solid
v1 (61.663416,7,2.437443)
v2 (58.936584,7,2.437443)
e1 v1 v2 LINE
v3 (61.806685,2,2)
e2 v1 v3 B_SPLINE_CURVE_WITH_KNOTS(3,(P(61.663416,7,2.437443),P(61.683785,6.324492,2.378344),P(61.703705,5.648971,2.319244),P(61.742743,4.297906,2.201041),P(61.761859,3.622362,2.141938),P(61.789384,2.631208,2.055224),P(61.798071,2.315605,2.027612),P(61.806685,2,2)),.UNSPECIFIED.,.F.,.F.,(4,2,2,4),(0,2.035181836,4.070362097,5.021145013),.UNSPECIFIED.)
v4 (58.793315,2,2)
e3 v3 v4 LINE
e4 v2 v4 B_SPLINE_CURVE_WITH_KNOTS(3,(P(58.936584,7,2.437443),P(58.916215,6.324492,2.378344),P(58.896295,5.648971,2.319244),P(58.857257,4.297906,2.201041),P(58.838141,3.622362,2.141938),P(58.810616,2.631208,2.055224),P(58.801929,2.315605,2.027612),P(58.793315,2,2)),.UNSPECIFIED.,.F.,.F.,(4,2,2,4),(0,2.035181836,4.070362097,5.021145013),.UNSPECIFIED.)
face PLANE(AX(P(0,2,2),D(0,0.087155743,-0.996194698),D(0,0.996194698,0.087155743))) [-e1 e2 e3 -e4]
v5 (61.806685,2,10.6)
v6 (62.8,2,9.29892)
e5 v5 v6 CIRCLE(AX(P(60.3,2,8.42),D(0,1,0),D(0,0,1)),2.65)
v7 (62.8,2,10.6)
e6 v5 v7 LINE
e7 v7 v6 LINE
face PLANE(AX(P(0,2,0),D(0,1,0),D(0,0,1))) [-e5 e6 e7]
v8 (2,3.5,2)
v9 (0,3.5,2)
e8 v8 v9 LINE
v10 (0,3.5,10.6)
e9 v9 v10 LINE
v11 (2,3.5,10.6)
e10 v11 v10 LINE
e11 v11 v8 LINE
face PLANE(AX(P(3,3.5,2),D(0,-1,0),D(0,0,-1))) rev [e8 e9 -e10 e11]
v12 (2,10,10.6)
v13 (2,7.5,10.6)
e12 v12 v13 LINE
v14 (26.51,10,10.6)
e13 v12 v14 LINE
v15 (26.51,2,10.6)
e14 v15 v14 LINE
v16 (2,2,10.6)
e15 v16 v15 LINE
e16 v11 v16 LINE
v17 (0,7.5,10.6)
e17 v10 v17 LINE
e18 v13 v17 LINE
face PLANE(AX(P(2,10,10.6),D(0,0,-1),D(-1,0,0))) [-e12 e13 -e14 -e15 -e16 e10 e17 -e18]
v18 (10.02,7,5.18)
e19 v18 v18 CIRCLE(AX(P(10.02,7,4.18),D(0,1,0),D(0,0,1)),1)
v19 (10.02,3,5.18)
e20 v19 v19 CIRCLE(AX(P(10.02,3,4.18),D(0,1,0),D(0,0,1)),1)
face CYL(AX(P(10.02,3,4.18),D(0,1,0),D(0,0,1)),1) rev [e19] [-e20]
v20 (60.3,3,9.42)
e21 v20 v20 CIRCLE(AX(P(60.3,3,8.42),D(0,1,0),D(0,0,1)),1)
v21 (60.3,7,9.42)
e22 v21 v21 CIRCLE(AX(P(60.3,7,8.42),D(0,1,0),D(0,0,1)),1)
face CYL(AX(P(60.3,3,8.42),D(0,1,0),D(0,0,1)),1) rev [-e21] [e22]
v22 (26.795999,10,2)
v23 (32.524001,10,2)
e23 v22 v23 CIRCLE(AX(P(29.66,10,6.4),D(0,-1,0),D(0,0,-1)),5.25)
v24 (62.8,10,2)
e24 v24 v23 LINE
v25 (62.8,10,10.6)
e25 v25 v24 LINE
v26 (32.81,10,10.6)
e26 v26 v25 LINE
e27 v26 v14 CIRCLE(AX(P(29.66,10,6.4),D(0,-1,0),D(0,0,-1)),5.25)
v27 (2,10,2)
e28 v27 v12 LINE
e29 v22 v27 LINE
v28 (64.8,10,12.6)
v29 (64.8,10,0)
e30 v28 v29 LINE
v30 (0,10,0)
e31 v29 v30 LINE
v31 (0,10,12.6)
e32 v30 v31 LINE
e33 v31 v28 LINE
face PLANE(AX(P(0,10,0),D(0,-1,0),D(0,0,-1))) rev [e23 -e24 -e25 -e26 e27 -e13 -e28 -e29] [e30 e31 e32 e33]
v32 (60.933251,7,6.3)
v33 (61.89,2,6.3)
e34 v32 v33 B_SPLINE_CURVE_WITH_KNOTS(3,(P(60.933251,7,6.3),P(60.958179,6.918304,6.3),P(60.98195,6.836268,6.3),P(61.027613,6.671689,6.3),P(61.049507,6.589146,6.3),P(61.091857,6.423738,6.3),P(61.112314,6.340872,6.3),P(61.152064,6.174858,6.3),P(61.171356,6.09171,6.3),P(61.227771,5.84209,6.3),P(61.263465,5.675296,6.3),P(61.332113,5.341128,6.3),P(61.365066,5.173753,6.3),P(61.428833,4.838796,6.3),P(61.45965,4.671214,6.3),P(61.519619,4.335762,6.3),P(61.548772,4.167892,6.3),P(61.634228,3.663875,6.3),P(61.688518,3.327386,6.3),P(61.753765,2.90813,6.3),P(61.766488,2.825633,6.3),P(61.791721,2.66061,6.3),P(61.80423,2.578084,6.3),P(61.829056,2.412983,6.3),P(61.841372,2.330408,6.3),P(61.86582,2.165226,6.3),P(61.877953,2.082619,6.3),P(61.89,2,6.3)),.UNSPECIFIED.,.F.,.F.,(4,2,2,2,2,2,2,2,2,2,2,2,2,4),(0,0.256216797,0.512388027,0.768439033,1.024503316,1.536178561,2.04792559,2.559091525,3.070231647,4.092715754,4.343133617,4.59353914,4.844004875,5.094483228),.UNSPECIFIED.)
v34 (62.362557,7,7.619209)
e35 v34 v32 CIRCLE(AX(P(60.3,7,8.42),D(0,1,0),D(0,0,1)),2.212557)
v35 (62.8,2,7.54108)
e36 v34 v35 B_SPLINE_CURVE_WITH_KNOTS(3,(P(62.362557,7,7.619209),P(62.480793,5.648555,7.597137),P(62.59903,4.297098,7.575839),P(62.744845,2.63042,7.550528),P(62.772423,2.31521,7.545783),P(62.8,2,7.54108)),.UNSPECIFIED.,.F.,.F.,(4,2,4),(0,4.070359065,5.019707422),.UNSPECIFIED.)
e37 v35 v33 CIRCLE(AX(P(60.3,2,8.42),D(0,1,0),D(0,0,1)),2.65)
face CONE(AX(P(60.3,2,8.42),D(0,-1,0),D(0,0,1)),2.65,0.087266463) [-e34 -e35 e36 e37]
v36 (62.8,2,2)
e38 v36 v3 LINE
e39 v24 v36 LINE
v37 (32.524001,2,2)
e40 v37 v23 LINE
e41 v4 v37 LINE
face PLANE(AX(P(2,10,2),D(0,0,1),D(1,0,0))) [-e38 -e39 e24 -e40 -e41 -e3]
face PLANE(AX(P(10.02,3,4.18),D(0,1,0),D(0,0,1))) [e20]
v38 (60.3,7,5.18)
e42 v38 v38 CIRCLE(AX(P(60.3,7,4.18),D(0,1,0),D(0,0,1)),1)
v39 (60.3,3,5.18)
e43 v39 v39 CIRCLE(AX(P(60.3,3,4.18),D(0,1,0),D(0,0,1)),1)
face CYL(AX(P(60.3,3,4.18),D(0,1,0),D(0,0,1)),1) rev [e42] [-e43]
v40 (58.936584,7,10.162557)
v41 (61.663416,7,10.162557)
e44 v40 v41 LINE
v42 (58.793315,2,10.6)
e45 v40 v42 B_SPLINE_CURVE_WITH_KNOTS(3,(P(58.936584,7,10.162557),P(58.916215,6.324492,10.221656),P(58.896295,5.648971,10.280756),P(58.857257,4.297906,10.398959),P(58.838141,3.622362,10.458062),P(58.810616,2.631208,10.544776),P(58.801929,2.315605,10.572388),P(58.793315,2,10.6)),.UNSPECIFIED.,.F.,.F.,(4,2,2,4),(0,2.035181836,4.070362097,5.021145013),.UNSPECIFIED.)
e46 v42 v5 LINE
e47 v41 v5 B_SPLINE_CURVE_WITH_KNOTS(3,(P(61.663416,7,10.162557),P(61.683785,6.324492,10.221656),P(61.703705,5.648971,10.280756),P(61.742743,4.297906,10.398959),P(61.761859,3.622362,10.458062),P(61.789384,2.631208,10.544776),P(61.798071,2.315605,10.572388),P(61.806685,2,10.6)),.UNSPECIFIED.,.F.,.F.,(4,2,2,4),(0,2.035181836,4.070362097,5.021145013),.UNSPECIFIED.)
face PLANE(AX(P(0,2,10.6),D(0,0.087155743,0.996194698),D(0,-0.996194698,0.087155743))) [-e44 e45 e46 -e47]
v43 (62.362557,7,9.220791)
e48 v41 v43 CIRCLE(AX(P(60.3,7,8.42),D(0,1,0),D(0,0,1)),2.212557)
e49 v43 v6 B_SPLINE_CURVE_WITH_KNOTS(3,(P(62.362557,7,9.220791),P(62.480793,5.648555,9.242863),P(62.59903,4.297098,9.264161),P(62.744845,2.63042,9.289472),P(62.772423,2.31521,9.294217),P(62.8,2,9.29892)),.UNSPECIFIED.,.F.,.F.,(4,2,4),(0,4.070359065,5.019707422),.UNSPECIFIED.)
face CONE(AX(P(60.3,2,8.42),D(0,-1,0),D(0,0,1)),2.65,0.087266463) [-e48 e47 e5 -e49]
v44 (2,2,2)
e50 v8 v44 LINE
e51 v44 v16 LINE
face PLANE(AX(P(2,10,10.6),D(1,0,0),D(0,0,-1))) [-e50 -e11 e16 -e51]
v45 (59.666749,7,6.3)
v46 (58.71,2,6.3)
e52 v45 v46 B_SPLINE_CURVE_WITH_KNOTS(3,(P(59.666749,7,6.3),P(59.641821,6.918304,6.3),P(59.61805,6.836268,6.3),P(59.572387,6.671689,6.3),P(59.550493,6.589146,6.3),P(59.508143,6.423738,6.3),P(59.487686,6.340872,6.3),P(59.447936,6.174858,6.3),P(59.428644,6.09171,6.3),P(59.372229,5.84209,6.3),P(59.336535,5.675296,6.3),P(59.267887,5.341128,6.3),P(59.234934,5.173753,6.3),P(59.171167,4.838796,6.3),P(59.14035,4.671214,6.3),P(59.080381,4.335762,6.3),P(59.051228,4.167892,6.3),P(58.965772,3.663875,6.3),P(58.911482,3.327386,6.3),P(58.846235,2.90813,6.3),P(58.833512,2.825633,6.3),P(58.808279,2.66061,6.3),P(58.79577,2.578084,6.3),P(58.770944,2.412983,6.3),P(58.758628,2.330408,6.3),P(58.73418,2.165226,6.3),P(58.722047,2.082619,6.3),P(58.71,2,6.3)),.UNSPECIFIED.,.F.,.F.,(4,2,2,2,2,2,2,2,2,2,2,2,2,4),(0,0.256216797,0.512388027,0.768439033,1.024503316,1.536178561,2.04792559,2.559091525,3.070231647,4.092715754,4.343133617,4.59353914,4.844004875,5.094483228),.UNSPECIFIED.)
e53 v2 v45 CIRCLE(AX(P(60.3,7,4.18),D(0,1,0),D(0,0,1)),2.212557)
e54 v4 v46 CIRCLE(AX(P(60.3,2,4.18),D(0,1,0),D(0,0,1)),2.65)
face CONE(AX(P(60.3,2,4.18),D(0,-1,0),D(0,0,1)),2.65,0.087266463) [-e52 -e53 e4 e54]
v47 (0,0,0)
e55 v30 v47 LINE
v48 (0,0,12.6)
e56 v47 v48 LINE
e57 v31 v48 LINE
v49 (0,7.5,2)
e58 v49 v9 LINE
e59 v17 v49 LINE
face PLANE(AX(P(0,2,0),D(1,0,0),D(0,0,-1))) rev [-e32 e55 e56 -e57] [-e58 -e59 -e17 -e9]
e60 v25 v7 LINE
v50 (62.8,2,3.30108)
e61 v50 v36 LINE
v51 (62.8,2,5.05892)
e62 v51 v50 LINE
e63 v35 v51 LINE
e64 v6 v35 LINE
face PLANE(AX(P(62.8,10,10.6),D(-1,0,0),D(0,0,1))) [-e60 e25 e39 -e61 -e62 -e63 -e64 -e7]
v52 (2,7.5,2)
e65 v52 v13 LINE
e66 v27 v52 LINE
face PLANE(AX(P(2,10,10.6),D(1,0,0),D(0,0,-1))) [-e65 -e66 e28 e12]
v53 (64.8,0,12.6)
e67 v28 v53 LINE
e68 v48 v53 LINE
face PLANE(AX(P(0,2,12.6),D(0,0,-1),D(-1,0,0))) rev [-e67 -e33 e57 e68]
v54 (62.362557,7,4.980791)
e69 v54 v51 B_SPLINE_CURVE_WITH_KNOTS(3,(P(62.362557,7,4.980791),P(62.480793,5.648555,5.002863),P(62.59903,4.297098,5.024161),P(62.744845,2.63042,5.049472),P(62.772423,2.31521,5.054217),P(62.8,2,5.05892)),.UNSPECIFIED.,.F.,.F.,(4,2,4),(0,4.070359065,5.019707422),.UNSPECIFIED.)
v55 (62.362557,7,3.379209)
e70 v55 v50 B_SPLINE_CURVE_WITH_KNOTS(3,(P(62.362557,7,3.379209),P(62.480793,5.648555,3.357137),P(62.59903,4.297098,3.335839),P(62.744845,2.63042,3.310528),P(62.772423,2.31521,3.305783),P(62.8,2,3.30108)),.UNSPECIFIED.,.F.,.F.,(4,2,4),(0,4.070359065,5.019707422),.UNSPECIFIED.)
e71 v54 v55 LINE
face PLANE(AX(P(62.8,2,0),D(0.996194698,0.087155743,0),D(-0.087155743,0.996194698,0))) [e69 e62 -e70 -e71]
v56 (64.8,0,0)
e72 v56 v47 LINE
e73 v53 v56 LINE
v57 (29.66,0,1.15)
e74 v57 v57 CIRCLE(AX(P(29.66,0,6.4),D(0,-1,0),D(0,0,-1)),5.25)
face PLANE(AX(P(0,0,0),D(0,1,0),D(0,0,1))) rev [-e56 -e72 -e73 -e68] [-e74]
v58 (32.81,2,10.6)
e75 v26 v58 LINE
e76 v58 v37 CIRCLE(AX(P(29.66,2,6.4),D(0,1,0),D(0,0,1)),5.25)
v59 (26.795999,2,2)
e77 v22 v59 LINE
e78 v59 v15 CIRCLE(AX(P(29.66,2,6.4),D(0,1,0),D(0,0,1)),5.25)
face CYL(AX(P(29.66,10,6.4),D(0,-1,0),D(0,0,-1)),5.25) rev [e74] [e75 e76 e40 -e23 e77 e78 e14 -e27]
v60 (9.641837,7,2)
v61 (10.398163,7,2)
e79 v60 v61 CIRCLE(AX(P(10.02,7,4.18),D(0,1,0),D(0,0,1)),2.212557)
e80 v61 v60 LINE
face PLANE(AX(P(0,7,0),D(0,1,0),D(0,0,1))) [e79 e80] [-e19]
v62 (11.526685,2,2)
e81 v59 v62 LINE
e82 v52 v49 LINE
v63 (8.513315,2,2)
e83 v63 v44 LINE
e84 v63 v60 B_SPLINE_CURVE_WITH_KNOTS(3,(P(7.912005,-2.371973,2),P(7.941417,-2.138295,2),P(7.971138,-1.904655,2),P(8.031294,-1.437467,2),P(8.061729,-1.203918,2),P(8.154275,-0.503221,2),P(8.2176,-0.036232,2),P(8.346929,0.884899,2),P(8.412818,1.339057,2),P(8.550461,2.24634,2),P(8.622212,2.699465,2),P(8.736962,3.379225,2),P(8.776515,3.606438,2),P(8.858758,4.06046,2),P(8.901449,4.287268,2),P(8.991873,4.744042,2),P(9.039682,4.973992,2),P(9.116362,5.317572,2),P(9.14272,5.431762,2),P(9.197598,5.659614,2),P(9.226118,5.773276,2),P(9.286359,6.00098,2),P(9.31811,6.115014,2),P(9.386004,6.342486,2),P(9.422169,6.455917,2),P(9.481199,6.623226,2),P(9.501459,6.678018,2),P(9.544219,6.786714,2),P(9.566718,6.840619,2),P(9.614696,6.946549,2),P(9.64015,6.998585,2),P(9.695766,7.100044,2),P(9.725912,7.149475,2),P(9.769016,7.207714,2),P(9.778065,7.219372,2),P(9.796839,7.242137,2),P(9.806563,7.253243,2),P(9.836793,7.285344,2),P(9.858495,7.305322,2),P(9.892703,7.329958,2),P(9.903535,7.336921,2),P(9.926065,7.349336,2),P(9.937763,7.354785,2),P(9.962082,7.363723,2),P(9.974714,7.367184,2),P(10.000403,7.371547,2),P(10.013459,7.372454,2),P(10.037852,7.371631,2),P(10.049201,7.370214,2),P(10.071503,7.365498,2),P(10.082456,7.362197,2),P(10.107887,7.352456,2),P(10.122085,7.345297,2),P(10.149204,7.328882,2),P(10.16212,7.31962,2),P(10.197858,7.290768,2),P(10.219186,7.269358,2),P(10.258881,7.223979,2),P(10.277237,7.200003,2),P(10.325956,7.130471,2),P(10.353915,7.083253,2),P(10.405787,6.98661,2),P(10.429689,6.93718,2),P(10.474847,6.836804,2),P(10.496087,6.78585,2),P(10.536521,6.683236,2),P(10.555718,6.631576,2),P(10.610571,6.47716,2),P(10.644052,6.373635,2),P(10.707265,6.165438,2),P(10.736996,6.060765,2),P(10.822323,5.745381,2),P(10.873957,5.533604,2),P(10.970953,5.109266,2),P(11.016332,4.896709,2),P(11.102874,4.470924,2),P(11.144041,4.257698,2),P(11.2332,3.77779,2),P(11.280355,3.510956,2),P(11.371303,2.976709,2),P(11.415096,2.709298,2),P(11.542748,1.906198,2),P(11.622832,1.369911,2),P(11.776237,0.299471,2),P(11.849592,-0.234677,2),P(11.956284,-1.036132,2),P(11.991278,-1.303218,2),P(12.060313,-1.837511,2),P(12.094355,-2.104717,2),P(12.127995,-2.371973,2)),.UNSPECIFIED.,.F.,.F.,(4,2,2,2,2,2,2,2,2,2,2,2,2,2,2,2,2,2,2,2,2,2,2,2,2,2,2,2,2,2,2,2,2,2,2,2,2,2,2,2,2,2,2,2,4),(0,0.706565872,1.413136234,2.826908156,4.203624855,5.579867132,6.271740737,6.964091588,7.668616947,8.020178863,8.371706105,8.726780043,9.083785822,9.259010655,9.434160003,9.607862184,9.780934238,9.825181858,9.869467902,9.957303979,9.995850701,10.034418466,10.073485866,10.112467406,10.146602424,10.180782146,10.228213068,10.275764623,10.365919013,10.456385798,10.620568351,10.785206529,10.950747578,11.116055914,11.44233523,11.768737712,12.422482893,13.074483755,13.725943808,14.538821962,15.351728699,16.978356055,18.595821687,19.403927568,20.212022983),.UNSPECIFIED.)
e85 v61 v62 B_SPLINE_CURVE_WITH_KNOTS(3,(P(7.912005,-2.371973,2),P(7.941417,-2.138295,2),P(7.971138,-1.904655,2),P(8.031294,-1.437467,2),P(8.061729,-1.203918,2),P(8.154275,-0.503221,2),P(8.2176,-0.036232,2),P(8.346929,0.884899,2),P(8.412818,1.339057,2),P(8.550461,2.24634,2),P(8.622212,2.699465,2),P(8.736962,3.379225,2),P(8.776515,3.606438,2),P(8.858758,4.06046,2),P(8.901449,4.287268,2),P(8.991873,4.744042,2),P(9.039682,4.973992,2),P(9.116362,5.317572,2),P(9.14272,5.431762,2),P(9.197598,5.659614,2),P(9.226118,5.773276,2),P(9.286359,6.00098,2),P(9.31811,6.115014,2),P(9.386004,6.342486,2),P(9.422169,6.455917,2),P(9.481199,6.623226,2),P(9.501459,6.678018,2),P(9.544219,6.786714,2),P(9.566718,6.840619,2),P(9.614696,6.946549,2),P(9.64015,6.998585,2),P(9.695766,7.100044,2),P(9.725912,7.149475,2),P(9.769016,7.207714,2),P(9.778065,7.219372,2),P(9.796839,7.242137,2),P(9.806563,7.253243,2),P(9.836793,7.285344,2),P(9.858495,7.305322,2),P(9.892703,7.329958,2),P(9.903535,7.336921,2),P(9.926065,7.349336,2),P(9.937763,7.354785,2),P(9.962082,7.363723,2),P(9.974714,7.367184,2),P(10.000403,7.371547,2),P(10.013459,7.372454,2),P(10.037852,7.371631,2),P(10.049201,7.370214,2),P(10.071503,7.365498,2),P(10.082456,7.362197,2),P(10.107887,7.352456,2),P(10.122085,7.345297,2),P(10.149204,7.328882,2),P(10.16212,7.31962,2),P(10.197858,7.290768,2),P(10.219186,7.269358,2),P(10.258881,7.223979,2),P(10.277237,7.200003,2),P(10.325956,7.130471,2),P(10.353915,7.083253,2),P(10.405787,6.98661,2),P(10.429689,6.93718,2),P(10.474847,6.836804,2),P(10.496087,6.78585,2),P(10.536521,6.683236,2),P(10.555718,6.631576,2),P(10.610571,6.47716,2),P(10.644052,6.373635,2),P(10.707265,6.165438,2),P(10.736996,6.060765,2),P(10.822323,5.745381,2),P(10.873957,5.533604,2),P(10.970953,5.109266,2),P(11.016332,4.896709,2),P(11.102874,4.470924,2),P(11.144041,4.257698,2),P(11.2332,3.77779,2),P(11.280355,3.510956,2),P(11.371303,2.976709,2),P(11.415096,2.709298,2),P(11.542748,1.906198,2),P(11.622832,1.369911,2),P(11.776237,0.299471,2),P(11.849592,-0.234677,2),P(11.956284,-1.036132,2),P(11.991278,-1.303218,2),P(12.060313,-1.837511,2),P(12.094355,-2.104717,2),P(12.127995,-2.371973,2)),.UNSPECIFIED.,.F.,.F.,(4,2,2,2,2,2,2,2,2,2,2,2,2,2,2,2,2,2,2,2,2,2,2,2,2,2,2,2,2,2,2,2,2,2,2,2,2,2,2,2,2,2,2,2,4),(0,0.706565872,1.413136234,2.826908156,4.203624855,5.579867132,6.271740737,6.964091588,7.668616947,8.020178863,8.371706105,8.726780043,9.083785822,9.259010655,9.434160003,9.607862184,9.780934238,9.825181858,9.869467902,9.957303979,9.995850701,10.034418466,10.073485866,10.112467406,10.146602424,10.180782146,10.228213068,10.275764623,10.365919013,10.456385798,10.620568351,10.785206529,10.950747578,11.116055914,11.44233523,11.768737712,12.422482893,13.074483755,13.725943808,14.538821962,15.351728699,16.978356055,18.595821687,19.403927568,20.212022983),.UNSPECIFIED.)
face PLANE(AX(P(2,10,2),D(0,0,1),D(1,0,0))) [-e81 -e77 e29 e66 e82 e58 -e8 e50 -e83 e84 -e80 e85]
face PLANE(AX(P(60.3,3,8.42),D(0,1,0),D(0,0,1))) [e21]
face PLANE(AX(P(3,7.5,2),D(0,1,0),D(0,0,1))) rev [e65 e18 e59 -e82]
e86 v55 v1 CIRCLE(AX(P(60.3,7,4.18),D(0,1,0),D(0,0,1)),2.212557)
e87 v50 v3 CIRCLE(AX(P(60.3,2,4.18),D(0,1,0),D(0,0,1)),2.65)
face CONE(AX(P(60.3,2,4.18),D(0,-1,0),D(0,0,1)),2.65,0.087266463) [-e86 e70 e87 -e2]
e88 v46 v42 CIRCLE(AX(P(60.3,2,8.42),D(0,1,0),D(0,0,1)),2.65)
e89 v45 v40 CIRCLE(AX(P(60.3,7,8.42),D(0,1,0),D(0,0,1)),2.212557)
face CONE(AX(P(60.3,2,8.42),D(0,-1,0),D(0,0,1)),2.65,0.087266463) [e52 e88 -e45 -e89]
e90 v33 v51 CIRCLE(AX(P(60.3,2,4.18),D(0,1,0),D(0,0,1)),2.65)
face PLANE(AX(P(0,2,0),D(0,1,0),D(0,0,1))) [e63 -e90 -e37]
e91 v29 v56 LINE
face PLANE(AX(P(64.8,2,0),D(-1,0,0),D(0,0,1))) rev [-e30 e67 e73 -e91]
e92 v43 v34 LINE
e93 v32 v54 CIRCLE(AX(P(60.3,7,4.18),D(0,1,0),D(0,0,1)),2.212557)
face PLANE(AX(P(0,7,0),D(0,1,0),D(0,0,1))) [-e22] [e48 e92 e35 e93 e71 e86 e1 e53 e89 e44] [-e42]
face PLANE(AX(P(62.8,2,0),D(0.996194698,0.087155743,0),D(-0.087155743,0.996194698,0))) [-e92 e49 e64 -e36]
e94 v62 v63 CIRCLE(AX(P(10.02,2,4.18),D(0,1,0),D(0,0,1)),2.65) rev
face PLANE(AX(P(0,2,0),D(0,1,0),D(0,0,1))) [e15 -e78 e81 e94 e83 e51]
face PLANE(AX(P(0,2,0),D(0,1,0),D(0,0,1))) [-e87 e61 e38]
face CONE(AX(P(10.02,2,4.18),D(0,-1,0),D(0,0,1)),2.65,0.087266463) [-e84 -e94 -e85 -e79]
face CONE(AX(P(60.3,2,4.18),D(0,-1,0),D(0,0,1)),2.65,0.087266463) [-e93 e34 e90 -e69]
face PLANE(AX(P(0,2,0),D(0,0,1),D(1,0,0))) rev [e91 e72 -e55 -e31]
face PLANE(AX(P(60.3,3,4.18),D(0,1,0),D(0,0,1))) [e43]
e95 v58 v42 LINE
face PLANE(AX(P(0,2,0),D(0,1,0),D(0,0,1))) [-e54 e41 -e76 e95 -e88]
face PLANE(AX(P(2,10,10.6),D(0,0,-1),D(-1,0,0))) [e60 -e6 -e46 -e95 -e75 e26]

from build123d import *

# Parameters (mm, degrees)
SKETCH1_W                     = 64.8
SKETCH1_H                     = 12.6
BOSS_EXTRUDE1_DEPTH           = 2
SKETCH2_W                     = 64.8
SKETCH2_H                     = 12.6
SKETCH2_W_2                   = 60.8
SKETCH2_H_2                   = 8.6
BOSS_EXTRUDE2_DEPTH           = 8
SKETCH3_R                     = 5.25
CUT_EXTRUDE1_DEPTH            = 67.766758196
BOSS_EXTRUDE3_DEPTH           = 5
BOSS_EXTRUDE3_DRAFT           = 5
SKETCH4_R                     = 2.65
BOSS_EXTRUDE3_PROFILE_2_DEPTH = 5
BOSS_EXTRUDE3_PROFILE_2_DRAFT = 5
SKETCH5_R                     = 1
CUT_EXTRUDE2_DEPTH            = 4
SKETCH6_W                     = 8.6
SKETCH6_H                     = 4
CUT_EXTRUDE3_DEPTH            = 3


with BuildPart() as part:
    # Sketch1 → Boss-Extrude1 (new body)
    with BuildSketch(Plane(origin=(0, 0, 0), x_dir=(1, 0, 0), z_dir=(0, 1, 0))):
        with Locations((32.4, -6.3)):
            Rectangle(SKETCH1_W, SKETCH1_H)
    extrude(amount=BOSS_EXTRUDE1_DEPTH)

    # Sketch2 → Boss-Extrude2 (add)
    with BuildSketch(Plane(origin=(0, 2, 0), x_dir=(1, 0, 0), z_dir=(0, 1, 0))):
        with Locations((32.4, -6.3)):
            Rectangle(SKETCH2_W, SKETCH2_H)
        with Locations((32.4, -6.3)):
            Rectangle(SKETCH2_W_2, SKETCH2_H_2, mode=Mode.SUBTRACT)
    extrude(amount=BOSS_EXTRUDE2_DEPTH)

    # Sketch3 → Cut-Extrude1 (cut, through all)
    with BuildSketch(Plane(origin=(0, 0, 0), x_dir=(-1, 0, 0), z_dir=(0, -1, 0))):
        with Locations((-29.66, -6.4)):
            Circle(SKETCH3_R)
    extrude(amount=-CUT_EXTRUDE1_DEPTH, mode=Mode.SUBTRACT)


with BuildPart() as boss_extrude3_tool:
    # Sketch4 → Boss-Extrude3 (with draft: the straight prism first)
    with BuildSketch(Plane(origin=(0, 2, 0), x_dir=(1, 0, 0), z_dir=(0, 1, 0))):
        with BuildLine():
            Line((62.8, -5.058919792), (62.8, -3.301080208))
            ThreePointArc((62.8, -3.301080208), (62.406319968, -2.571921583), (61.806685103, -2))
            Line((61.806685103, -2), (58.793314897, -2))
            ThreePointArc((58.793314897, -2), (57.650497281, -4.128664408), (58.71, -6.3))
            ThreePointArc((58.71, -6.3), (57.650497281, -8.471335592), (58.793314897, -10.6))
            Line((58.793314897, -10.6), (61.806685103, -10.6))
            ThreePointArc((61.806685103, -10.6), (62.406319968, -10.028078417), (62.8, -9.298919792))
            Line((62.8, -9.298919792), (62.8, -7.541080208))
            ThreePointArc((62.8, -7.541080208), (62.437076279, -6.85302681), (61.89, -6.3))
            ThreePointArc((61.89, -6.3), (62.437076279, -5.74697319), (62.8, -5.058919792))
        make_face()
    extrude(amount=BOSS_EXTRUDE3_DEPTH)
    # Boss-Extrude3: the draft: its side faces are tilted about the plane it starts from
    boss_extrude3_sides = [boss_extrude3_tool.faces().sort_by_distance(p)[0] for p in [
        (60.3, 4.5, 10.6),
        (62.406319968, 4.5, 10.028078417),
        (62.8, 4.5, 8.42),
        (62.437076279, 4.5, 6.85302681),
        (62.437076279, 4.5, 5.74697319),
        (62.8, 4.5, 4.18),
        (62.406319968, 4.5, 2.571921583),
        (60.3, 4.5, 2),
        (57.650497281, 4.5, 4.128664408),
        (57.650497281, 4.5, 8.471335592),
    ]]
    draft(boss_extrude3_sides, Plane(origin=(0, 2, 0), x_dir=(1, 0, 0), z_dir=(0, 1, 0)), BOSS_EXTRUDE3_DRAFT)


with BuildPart() as part_1:
    add(part.part)

    # Boss-Extrude3: add boss_extrude3_tool
    add(boss_extrude3_tool.part)


with BuildPart() as boss_extrude3_profile_2_tool:
    # Sketch4 → Boss-Extrude3 profile 2 (with draft: the straight prism first)
    with BuildSketch(Plane(origin=(0, 2, 0), x_dir=(1, 0, 0), z_dir=(0, 1, 0))):
        with Locations((10.02, -4.18)):
            Circle(SKETCH4_R)
    extrude(amount=BOSS_EXTRUDE3_PROFILE_2_DEPTH)
    # Boss-Extrude3 profile 2: the draft: its side faces are tilted about the plane it starts from
    boss_extrude3_profile_2_sides = [boss_extrude3_profile_2_tool.faces().sort_by_distance(p)[0] for p in [
        (7.37, 4.5, 4.18),
    ]]
    draft(boss_extrude3_profile_2_sides, Plane(origin=(0, 2, 0), x_dir=(1, 0, 0), z_dir=(0, 1, 0)), BOSS_EXTRUDE3_PROFILE_2_DRAFT)


with BuildPart() as part_2:
    add(part_1.part)

    # Boss-Extrude3 profile 2: add boss_extrude3_profile_2_tool
    add(boss_extrude3_profile_2_tool.part)

    # Sketch5 → Cut-Extrude2 (cut)
    with BuildSketch(Plane(origin=(0, 7, 0), x_dir=(1, 0, 0), z_dir=(0, 1, 0))):
        with Locations((60.3, -8.42)):
            Circle(SKETCH5_R)
        with Locations((10.02, -4.18)):
            Circle(SKETCH5_R)
        with Locations((60.3, -4.18)):
            Circle(SKETCH5_R)
    extrude(amount=-CUT_EXTRUDE2_DEPTH, mode=Mode.SUBTRACT)

    # Sketch6 → Cut-Extrude3 (cut)
    with BuildSketch(Plane.ZY):
        with Locations((6.3, 5.5)):
            Rectangle(SKETCH6_W, SKETCH6_H)
    extrude(amount=-CUT_EXTRUDE3_DEPTH, mode=Mode.SUBTRACT)


solid = part_2.part
